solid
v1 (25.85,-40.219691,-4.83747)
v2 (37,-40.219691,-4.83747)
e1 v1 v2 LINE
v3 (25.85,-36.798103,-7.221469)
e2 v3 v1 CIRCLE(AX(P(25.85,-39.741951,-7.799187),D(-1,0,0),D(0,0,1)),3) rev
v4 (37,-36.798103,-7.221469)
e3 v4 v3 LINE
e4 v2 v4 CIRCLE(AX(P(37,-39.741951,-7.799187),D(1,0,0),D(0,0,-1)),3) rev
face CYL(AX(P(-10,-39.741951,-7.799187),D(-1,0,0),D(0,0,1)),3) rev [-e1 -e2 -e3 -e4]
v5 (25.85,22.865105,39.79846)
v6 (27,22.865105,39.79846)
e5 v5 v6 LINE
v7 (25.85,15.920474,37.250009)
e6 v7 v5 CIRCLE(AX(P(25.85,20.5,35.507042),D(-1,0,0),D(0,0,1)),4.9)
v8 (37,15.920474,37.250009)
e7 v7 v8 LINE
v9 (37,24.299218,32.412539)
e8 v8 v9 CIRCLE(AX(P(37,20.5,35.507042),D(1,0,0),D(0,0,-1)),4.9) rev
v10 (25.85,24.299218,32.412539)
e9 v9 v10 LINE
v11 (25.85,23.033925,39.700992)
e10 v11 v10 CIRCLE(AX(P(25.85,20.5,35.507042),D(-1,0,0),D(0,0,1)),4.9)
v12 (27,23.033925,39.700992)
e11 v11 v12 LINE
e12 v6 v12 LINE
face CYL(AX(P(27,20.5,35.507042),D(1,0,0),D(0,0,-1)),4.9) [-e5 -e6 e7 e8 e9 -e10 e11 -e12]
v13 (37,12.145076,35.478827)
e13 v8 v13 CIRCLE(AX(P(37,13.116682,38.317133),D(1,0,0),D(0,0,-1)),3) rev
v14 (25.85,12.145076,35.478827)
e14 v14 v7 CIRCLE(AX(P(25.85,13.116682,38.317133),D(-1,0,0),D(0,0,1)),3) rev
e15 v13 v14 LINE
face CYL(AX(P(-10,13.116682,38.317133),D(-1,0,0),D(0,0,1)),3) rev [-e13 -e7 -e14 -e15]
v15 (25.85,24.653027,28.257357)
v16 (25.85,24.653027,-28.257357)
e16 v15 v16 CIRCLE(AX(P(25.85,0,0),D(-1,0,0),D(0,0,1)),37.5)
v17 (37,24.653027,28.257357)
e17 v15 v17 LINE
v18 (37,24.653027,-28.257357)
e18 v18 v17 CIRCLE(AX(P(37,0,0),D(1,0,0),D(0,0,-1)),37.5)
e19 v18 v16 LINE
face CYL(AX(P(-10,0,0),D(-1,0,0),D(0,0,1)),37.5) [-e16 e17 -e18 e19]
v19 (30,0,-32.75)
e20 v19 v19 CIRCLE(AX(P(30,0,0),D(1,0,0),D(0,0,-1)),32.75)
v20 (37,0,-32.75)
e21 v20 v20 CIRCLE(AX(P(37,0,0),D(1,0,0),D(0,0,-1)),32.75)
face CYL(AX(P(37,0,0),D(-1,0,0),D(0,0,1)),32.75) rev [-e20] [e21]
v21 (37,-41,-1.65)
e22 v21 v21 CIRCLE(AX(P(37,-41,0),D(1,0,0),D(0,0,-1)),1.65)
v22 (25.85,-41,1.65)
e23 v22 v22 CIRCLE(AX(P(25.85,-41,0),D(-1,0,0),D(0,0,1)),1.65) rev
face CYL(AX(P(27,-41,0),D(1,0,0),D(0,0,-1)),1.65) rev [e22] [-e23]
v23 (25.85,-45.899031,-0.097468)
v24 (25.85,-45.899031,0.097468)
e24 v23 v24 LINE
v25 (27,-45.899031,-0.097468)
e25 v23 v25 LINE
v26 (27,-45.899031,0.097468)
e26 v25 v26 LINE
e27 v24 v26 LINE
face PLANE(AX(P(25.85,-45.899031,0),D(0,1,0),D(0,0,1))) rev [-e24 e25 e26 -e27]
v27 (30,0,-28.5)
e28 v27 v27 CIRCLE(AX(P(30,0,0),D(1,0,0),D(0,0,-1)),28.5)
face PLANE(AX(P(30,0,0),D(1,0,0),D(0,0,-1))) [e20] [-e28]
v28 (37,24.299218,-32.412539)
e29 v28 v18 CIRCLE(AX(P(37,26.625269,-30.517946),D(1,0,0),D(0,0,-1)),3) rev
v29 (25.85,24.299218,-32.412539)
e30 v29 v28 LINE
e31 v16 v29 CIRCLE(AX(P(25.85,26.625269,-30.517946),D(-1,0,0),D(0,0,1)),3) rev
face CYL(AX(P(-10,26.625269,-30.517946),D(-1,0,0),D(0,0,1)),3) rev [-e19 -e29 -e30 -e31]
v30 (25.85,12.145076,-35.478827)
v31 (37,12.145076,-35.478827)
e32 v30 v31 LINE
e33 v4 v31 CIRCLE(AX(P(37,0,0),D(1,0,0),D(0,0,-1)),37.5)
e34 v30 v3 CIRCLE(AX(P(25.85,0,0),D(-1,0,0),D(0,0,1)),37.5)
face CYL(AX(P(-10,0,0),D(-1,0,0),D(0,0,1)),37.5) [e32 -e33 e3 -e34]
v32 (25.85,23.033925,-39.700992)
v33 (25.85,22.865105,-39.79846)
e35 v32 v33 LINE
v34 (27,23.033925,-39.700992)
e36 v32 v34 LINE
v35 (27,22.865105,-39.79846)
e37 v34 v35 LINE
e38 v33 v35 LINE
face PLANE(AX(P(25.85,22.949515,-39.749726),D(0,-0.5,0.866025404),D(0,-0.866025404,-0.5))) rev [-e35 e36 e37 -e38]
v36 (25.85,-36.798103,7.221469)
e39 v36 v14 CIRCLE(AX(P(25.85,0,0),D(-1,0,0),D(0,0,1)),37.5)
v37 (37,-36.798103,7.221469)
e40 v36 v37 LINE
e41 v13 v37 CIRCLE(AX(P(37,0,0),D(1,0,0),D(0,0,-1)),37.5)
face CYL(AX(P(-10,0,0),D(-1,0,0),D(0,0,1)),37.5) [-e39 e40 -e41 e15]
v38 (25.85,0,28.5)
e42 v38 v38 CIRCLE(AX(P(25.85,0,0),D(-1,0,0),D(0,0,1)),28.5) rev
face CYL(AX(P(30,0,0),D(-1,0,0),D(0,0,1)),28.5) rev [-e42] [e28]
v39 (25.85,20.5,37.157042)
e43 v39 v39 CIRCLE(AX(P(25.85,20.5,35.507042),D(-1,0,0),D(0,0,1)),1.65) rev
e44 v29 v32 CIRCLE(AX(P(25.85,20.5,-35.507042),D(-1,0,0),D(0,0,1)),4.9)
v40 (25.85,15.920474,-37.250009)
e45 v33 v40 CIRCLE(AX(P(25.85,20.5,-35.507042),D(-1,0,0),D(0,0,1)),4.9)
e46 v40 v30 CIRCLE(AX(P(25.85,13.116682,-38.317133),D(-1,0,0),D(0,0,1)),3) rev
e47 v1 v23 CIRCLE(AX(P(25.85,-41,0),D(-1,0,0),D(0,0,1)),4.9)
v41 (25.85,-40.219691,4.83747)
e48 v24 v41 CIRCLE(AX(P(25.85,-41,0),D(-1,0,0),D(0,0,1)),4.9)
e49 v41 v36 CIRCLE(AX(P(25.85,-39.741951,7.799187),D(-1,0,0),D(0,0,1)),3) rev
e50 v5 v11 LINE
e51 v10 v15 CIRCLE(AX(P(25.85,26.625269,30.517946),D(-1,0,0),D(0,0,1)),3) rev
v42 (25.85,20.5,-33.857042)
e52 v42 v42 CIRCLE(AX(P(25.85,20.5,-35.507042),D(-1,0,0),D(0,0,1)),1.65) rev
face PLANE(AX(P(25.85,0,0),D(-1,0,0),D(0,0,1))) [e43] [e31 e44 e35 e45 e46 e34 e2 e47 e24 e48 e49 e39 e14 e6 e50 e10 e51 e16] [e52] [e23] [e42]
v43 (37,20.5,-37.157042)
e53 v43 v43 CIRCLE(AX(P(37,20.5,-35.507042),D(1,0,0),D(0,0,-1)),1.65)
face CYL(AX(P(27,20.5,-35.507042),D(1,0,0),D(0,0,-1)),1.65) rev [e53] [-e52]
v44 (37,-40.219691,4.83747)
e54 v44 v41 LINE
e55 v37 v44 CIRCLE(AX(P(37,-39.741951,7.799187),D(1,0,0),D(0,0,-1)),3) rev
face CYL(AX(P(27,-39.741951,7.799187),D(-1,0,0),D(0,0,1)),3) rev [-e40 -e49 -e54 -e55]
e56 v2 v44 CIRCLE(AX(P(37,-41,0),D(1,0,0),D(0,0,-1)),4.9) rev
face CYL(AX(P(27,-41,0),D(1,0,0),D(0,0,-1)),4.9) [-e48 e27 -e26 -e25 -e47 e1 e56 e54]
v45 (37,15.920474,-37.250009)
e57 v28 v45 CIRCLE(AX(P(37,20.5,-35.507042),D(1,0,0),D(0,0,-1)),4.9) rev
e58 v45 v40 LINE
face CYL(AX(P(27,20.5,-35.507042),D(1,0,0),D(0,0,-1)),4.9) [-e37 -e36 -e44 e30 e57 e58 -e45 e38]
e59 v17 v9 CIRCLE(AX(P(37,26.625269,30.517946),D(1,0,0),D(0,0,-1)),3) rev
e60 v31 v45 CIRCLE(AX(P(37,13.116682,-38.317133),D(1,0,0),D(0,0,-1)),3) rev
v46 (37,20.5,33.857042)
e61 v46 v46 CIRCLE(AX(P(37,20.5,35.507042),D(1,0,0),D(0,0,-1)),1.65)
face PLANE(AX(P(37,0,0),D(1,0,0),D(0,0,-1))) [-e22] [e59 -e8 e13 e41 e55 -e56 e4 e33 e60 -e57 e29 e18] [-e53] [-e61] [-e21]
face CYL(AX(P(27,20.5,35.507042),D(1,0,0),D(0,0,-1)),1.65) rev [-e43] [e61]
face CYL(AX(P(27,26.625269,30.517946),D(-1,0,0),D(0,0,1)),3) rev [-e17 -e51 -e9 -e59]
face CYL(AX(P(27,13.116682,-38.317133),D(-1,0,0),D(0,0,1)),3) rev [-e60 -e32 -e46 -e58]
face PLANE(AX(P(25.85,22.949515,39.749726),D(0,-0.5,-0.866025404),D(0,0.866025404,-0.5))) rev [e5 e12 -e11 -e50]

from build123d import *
from build123d.topology import SkipClean

# Parameters (mm, degrees)
BASPROSKE_W         = 26
BASPROSKE_H         = 4.375
TOOTHCUT_DEPTH      = 60.063525123
TEETHCUTS_COUNT     = 55
TEETHCUTS_ANGLE     = 353.454545455
SKETCH2_R           = 37.5
BOSS_EXTRUDE2_DEPTH = 4.5
SKETCH3_R           = 2.25
SKETCH3_R_2         = 1.8
CUT_EXTRUDE1_DEPTH  = 4.5
SKETCH4_R           = 3.25
CUT_EXTRUDE2_DEPTH  = 3
BOSS_EXTRUDE3_START = 4
SKETCH5_R           = 37.5
SKETCH5_R_2         = 28.5
BOSS_EXTRUDE3_DEPTH = 4
BOSS_EXTRUDE4_START = 7
SKETCH6_R           = 37.5
SKETCH6_R_2         = 32.75
BOSS_EXTRUDE4_DEPTH = 7
SKETCH7_R           = 1.65
BOSS_EXTRUDE5_DEPTH = 10
FILLET1_R           = 3
BOSS_EXTRUDE6_START = -10
SKETCH8_R           = 1.65
BOSS_EXTRUDE6_DEPTH = 10
FILLET2_R           = 3
SKETCH9_R           = 37.6
SKETCH9_R_2         = 37.5
BOSS_EXTRUDE7_DEPTH = 10
FILLET3_R           = 3
SKETCH10_R          = 45.899134002
SKETCH10_R_2        = 2.25
CUT_EXTRUDE3_DEPTH  = 31.5
SKETCH12_R          = 1.65
SKETCH12_R_2        = 28.5
BOSS_EXTRUDE8_DEPTH = 1.15


with BuildPart() as part:
    # BasProSke → Base-Revolve (revolve)
    with BuildSketch(Plane(origin=(0, 0, 0), x_dir=(1, 0, 0), z_dir=(0, 1, 0)), mode=Mode.PRIVATE) as base_revolve_sk:
        with Locations((13, 35.3125)):
            Rectangle(BASPROSKE_W, BASPROSKE_H)
    revolve(base_revolve_sk.sketch.rotate(Axis((-10, 0, 0), (1, 0, 0)), 180), axis=Axis((-10, 0, 0), (1, 0, 0)))

    # TooCutSke → ToothCut (cut, through all)
    with BuildSketch(Plane(origin=(0, 0, 0), x_dir=(0, 0, -1), z_dir=(1, 0, 0))):
        with BuildLine():
            ThreePointArc((1.451447951, 33.067761022), (1.040603726, 34.522224287), (0.503573985, 35.934971761))
            ThreePointArc((0.503573985, 35.934971761), (0, 35.9385), (-0.503573985, 35.934971761))
            ThreePointArc((-0.503573985, 35.934971761), (-1.040603726, 34.522224287), (-1.451447951, 33.067761022))
            ThreePointArc((-1.451447951, 33.067761022), (0, 33.0996), (1.451447951, 33.067761022))
        make_face()
    toothcut = extrude(amount=TOOTHCUT_DEPTH, mode=Mode.SUBTRACT)

    # TeethCuts: ToothCut ×55 about axis
    teethcuts_axis = Axis((-10, 0, 0), (1, 0, 0))
    for i in range(1, TEETHCUTS_COUNT):
        add(toothcut.rotate(teethcuts_axis, i * TEETHCUTS_ANGLE / (TEETHCUTS_COUNT - 1)), mode=Mode.SUBTRACT)

    # Sketch2 → Boss-Extrude2 (add)
    with BuildSketch(Plane.ZY):
        Circle(SKETCH2_R)
    extrude(amount=BOSS_EXTRUDE2_DEPTH)

    # Sketch3 → Cut-Extrude1 (cut)
    with BuildSketch(Plane.ZY.offset(4.5)):
        Circle(SKETCH3_R)
        with Locations((0, 8.5)):
            Circle(SKETCH3_R_2)
        with Locations(Location((0, -8.5, 0), (0, 0, 180))):
            Circle(SKETCH3_R_2)
    extrude(amount=-CUT_EXTRUDE1_DEPTH, mode=Mode.SUBTRACT)

    # Sketch4 → Cut-Extrude2 (cut)
    with BuildSketch(Plane(origin=(0, 0, 0), x_dir=(0, 0, -1), z_dir=(1, 0, 0))):
        with Locations((0, -8.5)):
            Circle(SKETCH4_R)
        with Locations((0, 8.5)):
            Circle(SKETCH4_R)
    extrude(amount=-CUT_EXTRUDE2_DEPTH, mode=Mode.SUBTRACT)

    # Sketch5 → Boss-Extrude3 (add)
    with BuildSketch(Plane(origin=(26, 0, 0), x_dir=(0, 0, -1), z_dir=(1, 0, 0)).offset(BOSS_EXTRUDE3_START)):
        with Locations(Location((0, 0, 0), (0, 0, 180))):
            Circle(SKETCH5_R)
        Circle(SKETCH5_R_2, mode=Mode.SUBTRACT)
    extrude(amount=-BOSS_EXTRUDE3_DEPTH)

    # Sketch6 → Boss-Extrude4 (add)
    with BuildSketch(Plane(origin=(30, 0, 0), x_dir=(0, 0, -1), z_dir=(1, 0, 0)).offset(BOSS_EXTRUDE4_START)):
        with Locations(Location((0, 0, 0), (0, 0, 180))):
            Circle(SKETCH6_R)
        Circle(SKETCH6_R_2, mode=Mode.SUBTRACT)
    extrude(amount=-BOSS_EXTRUDE4_DEPTH)

    # Sketch7 → Boss-Extrude5 (add)
    # profile 1 of 3: a face of its own
    with BuildSketch(Plane(origin=(37, 0, 0), x_dir=(0, 0, -1), z_dir=(1, 0, 0))):
        with BuildLine():
            ThreePointArc((-30.713496008, 21.515835168), (-39.750566034, 22.95), (-33.990007843, 15.840750198))
            ThreePointArc((-33.990007843, 15.840750198), (-32.475952642, 18.75), (-30.713496008, 21.515835168))
        make_face()
        with Locations((-35.507041555, 20.5)):
            Circle(SKETCH7_R, mode=Mode.SUBTRACT)
    # profile 2 of 3: a face of its own
    with BuildSketch(Plane(origin=(37, 0, 0), x_dir=(0, 0, -1), z_dir=(1, 0, 0))):
        with BuildLine():
            ThreePointArc((-3.276511835, -37.356585366), (0, -45.9), (3.276511835, -37.356585366))
            ThreePointArc((3.276511835, -37.356585366), (0, -37.5), (-3.276511835, -37.356585366))
        make_face()
        with Locations((0, -41)):
            Circle(SKETCH7_R, mode=Mode.SUBTRACT)
    # profile 3 of 3: a face of its own
    with BuildSketch(Plane(origin=(37, 0, 0), x_dir=(0, 0, -1), z_dir=(1, 0, 0))):
        with BuildLine():
            ThreePointArc((30.713496008, 21.515835168), (32.475952642, 18.75), (33.990007843, 15.840750198))
            ThreePointArc((33.990007843, 15.840750198), (39.750566034, 22.95), (30.713496008, 21.515835168))
        make_face()
        with Locations((35.507041555, 20.5)):
            Circle(SKETCH7_R, mode=Mode.SUBTRACT)
    extrude(amount=-BOSS_EXTRUDE5_DEPTH)

    # Fillet1
    fillet1_edges = [part.edges().sort_by_distance(p)[0] for p in [
        (32, 15.840750198, 33.990007843),
        (32, 21.515835168, 30.713496008),
        (32, -37.356585366, -3.276511835),
        (32, -37.356585366, 3.276511835),
        (32, 21.515835168, -30.713496008),
        (32, 15.840750198, -33.990007843),
    ]]
    fillet(fillet1_edges, radius=FILLET1_R)

    # Sketch8 → Boss-Extrude6 (add)
    # profile 1 of 3: a face of its own
    with BuildSketch(Plane.ZY.offset(4.5).offset(BOSS_EXTRUDE6_START)):
        with BuildLine():
            ThreePointArc((3.277032239, 37.357537298), (-0.001858552, 45.899133961), (-3.279499265, 37.357057531))
            ThreePointArc((-3.279499265, 37.357057531), (-0.001244018, 37.500865925), (3.277032239, 37.357537298))
        make_face()
        with Locations((0, 41)):
            Circle(SKETCH8_R, mode=Mode.SUBTRACT)
    # profile 2 of 3: a face of its own
    with BuildSketch(Plane.ZY.offset(4.5).offset(BOSS_EXTRUDE6_START)):
        with BuildLine():
            ThreePointArc((30.71426819, -21.517740103), (39.750655671, -22.948112687), (33.993202634, -15.837979147))
            ThreePointArc((33.993202634, -15.837979147), (32.478138639, -18.749677793), (30.71426819, -21.517740103))
        make_face()
        with Locations((35.507041555, -20.5)):
            Circle(SKETCH8_R, mode=Mode.SUBTRACT)
    # profile 3 of 3: a face of its own
    with BuildSketch(Plane.ZY.offset(4.5).offset(BOSS_EXTRUDE6_START)):
        with BuildLine():
            ThreePointArc((-30.712203543, -21.517680022), (-32.47526663, -18.751188157), (-33.989800256, -15.841195617))
            ThreePointArc((-33.989800256, -15.841195617), (-39.748976395, -22.951021278), (-30.712203543, -21.517680022))
        make_face()
        with Locations((-35.507041555, -20.5)):
            Circle(SKETCH8_R, mode=Mode.SUBTRACT)
    extrude(amount=BOSS_EXTRUDE6_DEPTH)


with BuildPart() as boss_extrude6_piece_1:
    # of the separate pieces the step leaves, piece 1, a body of its own (boss_extrude6_pieces)
    add(part.part.solids().sort_by_distance((37, -36.798102981, 7.221469172))[0])

    # Fillet2
    fillet2_edges = [boss_extrude6_piece_1.edges().sort_by_distance(p)[0] for p in [
        (0.5, -21.517680022, -30.712203543),
        (0.5, -15.841195617, -33.989800256),
    ]]
    fillet(fillet2_edges, radius=FILLET2_R)



with BuildPart() as boss_extrude6_piece_2:
    # of the separate pieces the step leaves, piece 2, a body of its own (boss_extrude6_pieces)
    add(part.part.solids().sort_by_distance((5.5, 37.357057531, -3.279499265))[0])


with BuildPart() as boss_extrude6_piece_3:
    # of the separate pieces the step leaves, piece 3, a body of its own (boss_extrude6_pieces)
    add(part.part.solids().sort_by_distance((5.5, -15.837979147, 33.993202634))[0])


with BuildPart() as boss_extrude6_piece_1_1:
    add(boss_extrude6_piece_1.part)

    add(boss_extrude6_piece_2.part)  # Boss-Extrude7 merges Boss-Extrude6 piece 2

    add(boss_extrude6_piece_3.part)  # Boss-Extrude7 merges Boss-Extrude6 piece 3
    # Sketch9 → Boss-Extrude7 (add)
    with BuildSketch(Plane.ZY.offset(4.5)):
        Circle(SKETCH9_R)
        Circle(SKETCH9_R_2, mode=Mode.SUBTRACT)
    extrude(amount=-BOSS_EXTRUDE7_DEPTH)

    # Fillet3
    fillet3_edges = [boss_extrude6_piece_1_1.edges().sort_by_distance(p)[0] for p in [
        (0.5, 37.448219223, 3.375037342),
        (0.5, 37.447972163, -3.377777505),
        (0.5, -21.646977688, 30.743590502),
        (0.5, -15.798744954, 34.119783966),
    ]]
    fillet(fillet3_edges, radius=FILLET3_R)

    # Sketch10 → Cut-Extrude3 (cut)
    with BuildSketch(Plane.ZY.offset(4.5)):
        Circle(SKETCH10_R)
        Circle(SKETCH10_R_2, mode=Mode.SUBTRACT)
    extrude(amount=-CUT_EXTRUDE3_DEPTH, mode=Mode.SUBTRACT)

    # Sketch12 → Boss-Extrude8 (add)
    with SkipClean():  # the faces are left unmerged after this step: merging them gives an invalid solid
        with BuildSketch(Plane.ZY.offset(-27)):
            with BuildLine():
                ThreePointArc((-32.412539248, 24.299217745), (-39.750566034, 22.95), (-37.250009483, 15.920473518))
                ThreePointArc((-37.250009483, 15.920473518), (-35.60116111, 14.39084752), (-35.478826578, 12.145075735))
                ThreePointArc((-35.478826578, 12.145075735), (-32.475952642, -18.75), (-7.221469172, -36.798102981))
                ThreePointArc((-7.221469172, -36.798102981), (-5.33774102, -38.026933686), (-4.837470235, -40.219691263))
                ThreePointArc((-4.837470235, -40.219691263), (0, -45.9), (4.837470235, -40.219691263))
                ThreePointArc((4.837470235, -40.219691263), (5.33774102, -38.026933686), (7.221469172, -36.798102981))
                ThreePointArc((7.221469172, -36.798102981), (32.475952642, -18.75), (35.478826578, 12.145075735))
                ThreePointArc((35.478826578, 12.145075735), (35.60116111, 14.39084752), (37.250009483, 15.920473518))
                ThreePointArc((37.250009483, 15.920473518), (39.750566034, 22.95), (32.412539248, 24.299217745))
                ThreePointArc((32.412539248, 24.299217745), (30.26342009, 23.636086166), (28.257357407, 24.653027246))
                ThreePointArc((28.257357407, 24.653027246), (0, 37.5), (-28.257357407, 24.653027246))
                ThreePointArc((-28.257357407, 24.653027246), (-30.177504217, 23.644648787), (-32.275580689, 24.194072128))
                add(Edge.make_bspline(
                    [(-32.275580681, 24.194072138), (-32.299145006, 24.211107976), (-32.322416857, 24.228349689), (-32.345393979, 24.245789385), (-32.368074444, 24.26341918), (-32.390456638, 24.28123123), (-32.412539248, 24.299217745)],
                    knots=[0.959340684, 0.959340684, 0.959340684, 0.959340684, 0.959340684, 0.959340684, 0.959340684, 1, 1, 1, 1, 1, 1, 1], degree=6))
            make_face()
            with Locations((0, -41)):
                Circle(SKETCH12_R, mode=Mode.SUBTRACT)
            with Locations((-35.507041555, 20.5)):
                Circle(SKETCH12_R, mode=Mode.SUBTRACT)
            Circle(SKETCH12_R_2, mode=Mode.SUBTRACT)
            with Locations((35.507041555, 20.5)):
                Circle(SKETCH12_R, mode=Mode.SUBTRACT)
        extrude(amount=BOSS_EXTRUDE8_DEPTH)


solid = boss_extrude6_piece_1_1.part
